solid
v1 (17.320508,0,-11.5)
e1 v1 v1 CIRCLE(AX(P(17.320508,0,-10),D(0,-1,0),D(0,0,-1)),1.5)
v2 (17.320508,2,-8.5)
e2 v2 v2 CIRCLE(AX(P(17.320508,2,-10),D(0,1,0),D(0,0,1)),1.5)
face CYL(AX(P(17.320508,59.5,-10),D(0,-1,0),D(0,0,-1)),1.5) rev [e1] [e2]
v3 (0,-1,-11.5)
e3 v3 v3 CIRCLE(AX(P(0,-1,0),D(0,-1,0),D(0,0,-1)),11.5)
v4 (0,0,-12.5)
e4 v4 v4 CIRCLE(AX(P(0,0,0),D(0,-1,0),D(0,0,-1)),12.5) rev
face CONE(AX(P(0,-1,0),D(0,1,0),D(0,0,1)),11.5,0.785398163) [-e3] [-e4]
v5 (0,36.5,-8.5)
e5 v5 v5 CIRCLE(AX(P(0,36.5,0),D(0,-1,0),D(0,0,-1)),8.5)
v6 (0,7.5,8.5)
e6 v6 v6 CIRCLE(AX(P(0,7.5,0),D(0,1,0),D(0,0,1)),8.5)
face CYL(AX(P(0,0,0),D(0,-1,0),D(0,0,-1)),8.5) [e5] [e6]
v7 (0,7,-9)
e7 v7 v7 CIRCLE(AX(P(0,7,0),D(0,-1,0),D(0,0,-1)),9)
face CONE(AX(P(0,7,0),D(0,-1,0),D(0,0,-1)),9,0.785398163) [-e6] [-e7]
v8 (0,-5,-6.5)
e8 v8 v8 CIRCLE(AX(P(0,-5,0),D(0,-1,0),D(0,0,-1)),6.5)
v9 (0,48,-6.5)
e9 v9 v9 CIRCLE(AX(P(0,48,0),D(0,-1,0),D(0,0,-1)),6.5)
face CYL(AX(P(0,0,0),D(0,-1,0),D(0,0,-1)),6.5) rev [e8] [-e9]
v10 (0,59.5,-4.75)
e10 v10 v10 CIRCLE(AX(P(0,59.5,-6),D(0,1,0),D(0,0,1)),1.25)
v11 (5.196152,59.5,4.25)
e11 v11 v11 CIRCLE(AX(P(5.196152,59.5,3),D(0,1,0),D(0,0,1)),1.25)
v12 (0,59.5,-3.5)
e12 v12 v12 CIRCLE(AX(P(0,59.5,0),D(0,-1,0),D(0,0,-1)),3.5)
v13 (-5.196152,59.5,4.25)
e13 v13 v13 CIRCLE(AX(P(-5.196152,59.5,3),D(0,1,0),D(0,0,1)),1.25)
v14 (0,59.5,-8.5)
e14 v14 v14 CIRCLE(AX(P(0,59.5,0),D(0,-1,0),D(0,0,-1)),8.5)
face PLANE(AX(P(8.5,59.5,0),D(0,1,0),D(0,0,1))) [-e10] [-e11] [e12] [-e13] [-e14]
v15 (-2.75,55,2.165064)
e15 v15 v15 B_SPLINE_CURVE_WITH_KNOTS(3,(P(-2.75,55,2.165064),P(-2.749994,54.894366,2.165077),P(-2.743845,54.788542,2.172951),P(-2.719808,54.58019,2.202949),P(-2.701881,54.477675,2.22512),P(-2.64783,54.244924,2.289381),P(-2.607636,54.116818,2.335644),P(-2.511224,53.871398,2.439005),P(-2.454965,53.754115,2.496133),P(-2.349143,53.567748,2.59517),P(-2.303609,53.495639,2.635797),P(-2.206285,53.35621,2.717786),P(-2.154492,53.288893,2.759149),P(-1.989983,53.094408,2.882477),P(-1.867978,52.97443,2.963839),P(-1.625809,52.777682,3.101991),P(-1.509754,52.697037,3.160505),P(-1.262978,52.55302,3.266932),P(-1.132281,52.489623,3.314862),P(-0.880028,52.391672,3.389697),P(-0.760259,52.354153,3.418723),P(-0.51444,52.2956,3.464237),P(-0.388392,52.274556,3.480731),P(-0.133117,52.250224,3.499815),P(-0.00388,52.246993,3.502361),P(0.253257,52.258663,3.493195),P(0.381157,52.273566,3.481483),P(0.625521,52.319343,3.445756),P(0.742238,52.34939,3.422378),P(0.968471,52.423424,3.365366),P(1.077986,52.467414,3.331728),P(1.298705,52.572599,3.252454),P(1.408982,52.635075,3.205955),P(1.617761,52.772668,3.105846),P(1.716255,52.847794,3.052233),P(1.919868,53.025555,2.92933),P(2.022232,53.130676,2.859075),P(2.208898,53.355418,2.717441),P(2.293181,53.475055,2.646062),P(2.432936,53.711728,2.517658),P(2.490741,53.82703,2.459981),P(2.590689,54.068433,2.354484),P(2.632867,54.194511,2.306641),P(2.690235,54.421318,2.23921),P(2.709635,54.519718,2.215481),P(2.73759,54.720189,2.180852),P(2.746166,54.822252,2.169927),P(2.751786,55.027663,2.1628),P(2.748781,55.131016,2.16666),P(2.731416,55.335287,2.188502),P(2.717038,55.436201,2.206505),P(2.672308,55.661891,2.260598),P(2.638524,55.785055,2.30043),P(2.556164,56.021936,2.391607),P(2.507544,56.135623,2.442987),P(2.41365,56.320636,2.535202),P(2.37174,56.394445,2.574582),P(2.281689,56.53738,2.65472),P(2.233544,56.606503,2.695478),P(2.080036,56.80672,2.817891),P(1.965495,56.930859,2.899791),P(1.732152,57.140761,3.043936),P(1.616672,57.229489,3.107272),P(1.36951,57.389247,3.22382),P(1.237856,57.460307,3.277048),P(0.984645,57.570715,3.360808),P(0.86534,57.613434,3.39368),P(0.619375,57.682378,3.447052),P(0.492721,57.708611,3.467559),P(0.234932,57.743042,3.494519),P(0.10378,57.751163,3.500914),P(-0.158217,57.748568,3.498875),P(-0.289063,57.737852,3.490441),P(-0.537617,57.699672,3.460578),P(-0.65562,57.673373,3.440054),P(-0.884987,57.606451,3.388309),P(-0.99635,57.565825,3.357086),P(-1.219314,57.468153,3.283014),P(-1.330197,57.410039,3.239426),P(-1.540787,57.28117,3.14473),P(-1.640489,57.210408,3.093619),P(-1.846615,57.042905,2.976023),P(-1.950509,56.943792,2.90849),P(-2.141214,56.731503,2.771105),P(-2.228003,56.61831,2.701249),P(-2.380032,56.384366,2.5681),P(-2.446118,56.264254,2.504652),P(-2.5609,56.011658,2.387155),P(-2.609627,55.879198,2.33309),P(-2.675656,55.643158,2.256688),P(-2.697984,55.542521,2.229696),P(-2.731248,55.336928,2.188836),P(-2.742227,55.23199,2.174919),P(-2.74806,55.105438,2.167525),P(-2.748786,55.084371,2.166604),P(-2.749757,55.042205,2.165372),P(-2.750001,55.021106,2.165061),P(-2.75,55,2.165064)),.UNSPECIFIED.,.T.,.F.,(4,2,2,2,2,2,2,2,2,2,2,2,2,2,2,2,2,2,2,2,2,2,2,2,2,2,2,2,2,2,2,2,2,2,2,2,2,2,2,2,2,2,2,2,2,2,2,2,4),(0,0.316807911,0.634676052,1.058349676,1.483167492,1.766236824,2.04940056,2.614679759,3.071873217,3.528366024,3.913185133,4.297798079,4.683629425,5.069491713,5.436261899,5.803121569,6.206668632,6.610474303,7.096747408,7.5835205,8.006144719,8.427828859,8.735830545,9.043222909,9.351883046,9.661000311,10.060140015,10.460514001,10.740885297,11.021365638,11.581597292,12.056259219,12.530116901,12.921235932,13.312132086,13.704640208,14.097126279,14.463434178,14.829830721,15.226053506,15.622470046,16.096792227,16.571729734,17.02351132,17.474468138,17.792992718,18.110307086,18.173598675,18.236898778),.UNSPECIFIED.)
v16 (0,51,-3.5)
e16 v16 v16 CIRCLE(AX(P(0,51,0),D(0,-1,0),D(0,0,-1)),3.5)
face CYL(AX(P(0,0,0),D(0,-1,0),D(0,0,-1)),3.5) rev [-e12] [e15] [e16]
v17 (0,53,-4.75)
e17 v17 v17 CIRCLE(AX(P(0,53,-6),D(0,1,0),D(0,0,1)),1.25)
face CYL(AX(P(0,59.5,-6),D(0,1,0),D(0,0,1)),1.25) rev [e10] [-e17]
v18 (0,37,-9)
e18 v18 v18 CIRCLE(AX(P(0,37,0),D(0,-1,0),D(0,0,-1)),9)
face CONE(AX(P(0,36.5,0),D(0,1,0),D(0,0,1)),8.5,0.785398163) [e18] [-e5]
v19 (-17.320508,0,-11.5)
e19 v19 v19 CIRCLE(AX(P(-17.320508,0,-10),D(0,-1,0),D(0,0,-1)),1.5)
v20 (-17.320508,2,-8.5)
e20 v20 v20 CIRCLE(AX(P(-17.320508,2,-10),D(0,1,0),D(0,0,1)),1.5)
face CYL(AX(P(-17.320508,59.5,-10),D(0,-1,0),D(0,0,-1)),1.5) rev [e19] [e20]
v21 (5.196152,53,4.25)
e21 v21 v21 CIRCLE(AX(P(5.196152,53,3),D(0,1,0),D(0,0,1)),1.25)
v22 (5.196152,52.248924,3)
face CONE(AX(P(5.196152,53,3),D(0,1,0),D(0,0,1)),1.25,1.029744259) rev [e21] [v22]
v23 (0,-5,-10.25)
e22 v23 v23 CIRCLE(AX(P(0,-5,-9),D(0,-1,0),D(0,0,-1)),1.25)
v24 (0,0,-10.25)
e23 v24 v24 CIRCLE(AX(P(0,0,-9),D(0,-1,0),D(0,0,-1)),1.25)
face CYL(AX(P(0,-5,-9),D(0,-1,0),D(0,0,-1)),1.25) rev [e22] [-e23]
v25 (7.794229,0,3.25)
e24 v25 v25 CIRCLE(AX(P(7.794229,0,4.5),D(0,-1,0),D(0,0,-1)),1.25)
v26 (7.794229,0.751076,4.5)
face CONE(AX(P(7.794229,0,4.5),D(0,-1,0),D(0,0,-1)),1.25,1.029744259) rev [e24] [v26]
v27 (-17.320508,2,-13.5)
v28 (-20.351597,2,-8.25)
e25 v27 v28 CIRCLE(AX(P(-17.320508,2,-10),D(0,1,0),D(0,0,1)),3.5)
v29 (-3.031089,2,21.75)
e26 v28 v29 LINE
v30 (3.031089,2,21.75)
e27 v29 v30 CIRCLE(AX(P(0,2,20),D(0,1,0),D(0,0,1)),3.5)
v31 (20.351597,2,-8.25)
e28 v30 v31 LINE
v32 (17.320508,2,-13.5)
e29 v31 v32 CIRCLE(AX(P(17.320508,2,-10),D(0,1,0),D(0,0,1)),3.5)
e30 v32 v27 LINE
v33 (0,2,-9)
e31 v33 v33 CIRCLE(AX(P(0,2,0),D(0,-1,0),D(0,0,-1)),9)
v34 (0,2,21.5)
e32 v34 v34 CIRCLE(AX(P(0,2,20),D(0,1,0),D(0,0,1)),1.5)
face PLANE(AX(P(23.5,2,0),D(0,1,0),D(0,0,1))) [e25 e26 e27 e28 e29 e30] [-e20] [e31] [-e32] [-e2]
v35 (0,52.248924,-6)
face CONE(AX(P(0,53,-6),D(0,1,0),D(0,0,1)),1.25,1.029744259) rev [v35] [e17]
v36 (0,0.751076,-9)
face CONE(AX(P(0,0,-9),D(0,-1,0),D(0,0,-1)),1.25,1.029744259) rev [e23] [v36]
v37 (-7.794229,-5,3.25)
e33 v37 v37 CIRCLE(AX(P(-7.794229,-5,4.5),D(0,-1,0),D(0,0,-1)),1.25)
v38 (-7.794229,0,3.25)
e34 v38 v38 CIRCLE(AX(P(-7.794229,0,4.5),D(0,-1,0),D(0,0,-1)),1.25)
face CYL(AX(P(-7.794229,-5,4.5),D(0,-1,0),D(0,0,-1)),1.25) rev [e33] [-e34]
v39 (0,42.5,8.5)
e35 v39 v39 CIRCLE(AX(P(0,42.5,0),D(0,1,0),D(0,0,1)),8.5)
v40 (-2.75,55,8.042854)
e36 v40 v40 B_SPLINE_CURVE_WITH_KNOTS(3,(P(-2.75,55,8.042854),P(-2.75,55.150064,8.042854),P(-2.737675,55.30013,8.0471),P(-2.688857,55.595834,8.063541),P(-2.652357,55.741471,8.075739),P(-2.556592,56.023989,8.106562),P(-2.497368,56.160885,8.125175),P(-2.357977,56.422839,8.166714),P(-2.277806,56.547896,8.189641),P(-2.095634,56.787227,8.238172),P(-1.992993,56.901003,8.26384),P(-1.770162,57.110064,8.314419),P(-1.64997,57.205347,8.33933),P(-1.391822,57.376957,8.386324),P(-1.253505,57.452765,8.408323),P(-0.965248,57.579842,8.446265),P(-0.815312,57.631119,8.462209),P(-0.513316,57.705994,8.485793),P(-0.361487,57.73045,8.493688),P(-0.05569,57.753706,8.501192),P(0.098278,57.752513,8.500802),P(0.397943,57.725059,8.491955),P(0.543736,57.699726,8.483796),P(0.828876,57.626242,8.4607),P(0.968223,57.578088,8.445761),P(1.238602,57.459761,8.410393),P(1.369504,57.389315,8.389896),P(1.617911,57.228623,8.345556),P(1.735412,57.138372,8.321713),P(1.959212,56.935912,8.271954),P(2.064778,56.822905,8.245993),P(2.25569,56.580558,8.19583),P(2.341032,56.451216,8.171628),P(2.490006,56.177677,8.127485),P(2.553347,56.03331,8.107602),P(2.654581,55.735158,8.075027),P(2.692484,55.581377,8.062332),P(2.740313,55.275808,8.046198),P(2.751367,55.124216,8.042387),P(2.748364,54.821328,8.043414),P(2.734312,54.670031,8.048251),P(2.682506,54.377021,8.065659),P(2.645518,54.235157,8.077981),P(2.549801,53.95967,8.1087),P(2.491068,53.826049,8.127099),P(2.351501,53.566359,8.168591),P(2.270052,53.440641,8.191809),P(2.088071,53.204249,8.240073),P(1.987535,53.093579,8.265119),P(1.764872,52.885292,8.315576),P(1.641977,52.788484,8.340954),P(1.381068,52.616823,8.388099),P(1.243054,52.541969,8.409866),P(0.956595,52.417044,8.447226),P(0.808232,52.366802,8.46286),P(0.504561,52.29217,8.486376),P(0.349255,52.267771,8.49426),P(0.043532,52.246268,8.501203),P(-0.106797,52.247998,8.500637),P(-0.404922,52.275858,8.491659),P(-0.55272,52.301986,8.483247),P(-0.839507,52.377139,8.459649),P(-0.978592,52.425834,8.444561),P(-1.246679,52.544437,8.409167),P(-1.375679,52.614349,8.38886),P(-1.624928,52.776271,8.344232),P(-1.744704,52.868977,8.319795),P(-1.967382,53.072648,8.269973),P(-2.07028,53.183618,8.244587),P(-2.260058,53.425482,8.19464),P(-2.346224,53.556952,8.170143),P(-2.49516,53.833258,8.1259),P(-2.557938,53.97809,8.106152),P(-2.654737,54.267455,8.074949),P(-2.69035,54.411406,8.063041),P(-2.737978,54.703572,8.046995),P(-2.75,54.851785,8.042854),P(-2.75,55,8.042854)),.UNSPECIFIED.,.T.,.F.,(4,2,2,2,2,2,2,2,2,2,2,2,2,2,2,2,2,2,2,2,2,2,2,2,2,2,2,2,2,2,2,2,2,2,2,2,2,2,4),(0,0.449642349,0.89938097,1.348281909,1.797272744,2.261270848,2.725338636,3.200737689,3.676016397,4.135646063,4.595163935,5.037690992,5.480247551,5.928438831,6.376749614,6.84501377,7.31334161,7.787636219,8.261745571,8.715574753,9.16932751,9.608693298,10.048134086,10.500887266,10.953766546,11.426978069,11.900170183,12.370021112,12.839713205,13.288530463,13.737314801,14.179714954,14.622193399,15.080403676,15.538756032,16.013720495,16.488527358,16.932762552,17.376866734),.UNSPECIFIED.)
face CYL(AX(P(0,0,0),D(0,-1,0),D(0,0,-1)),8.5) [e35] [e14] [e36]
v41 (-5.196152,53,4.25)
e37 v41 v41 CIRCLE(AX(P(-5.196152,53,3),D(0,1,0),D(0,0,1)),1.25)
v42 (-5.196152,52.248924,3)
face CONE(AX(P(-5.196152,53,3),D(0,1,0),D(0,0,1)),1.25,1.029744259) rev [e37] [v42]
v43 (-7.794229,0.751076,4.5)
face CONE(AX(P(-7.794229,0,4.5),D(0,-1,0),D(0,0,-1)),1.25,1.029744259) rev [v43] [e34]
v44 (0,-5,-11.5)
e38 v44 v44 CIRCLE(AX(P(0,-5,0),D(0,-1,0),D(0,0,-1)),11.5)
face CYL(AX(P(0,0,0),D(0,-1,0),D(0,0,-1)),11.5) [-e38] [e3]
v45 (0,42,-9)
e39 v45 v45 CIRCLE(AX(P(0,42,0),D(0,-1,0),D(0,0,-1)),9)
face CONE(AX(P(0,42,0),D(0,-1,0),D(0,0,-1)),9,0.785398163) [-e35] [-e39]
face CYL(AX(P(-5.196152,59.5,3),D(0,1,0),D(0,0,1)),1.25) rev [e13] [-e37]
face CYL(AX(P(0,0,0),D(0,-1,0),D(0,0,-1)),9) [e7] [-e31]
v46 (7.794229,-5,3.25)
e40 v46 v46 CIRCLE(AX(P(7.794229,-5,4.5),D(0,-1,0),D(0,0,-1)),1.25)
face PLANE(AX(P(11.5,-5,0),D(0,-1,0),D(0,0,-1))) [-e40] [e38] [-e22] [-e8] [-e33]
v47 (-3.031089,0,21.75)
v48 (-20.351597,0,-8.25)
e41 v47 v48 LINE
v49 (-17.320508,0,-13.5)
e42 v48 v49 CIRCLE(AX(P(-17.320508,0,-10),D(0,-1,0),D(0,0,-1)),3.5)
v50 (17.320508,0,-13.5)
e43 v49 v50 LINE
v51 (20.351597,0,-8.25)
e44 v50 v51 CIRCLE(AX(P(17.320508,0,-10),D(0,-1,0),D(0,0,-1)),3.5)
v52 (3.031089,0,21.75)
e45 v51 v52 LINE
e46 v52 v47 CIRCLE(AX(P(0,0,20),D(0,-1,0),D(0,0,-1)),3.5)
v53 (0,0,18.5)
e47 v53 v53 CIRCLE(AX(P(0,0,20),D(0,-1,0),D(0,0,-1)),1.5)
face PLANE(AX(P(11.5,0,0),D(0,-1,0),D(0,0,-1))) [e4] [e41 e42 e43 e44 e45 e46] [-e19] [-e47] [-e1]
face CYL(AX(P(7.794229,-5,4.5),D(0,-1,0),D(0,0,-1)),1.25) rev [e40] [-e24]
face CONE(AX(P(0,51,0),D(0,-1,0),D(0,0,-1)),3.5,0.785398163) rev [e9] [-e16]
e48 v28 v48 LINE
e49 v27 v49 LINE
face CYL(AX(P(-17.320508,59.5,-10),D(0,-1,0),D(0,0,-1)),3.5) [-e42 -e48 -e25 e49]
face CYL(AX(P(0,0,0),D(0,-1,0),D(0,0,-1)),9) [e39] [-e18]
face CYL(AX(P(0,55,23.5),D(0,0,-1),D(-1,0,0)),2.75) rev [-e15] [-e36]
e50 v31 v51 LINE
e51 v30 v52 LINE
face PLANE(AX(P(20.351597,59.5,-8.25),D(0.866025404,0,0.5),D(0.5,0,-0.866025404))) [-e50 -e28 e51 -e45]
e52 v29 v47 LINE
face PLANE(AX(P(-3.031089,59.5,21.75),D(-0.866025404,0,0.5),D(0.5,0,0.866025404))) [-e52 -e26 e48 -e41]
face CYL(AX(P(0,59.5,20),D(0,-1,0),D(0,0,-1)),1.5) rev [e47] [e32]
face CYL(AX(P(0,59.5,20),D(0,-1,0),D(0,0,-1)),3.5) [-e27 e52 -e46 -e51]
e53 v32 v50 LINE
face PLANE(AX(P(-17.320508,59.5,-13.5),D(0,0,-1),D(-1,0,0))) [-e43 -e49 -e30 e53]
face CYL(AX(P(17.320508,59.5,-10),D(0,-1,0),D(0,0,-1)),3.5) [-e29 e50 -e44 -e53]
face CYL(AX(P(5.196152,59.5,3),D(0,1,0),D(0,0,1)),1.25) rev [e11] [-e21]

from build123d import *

# Parameters (mm, degrees)
CHAMFER_1_SIZE         = 0.5
CHAMFER_2_SIZE         = 1
SKETCH_9_OUTSIDE_W     = 67.524
SKETCH_9_OUTSIDE_H     = 67.524
SKETCH_9_OUTSIDE_R     = 1.5
CUT_EXTRUDE_2_DEPTH    = 69.152402746
HOLE_WIZARD_M3_1_D     = 2.5
HOLE_WIZARD_M3_1_DEPTH = 5
HOLE_WIZARD_M3_1_TIP   = 0.751075774
HOLE_WIZARD_M3_2_D     = 2.5
HOLE_WIZARD_M3_2_DEPTH = 6.5
HOLE_WIZARD_M3_2_TIP   = 0.751075774
SKETCH_11_R            = 2.75
CUT_EXTRUDE_4_DEPTH    = 68.275504878


with BuildPart() as part:
    # 草图2 → 旋转1 (revolve)
    with BuildSketch(Plane.XY, mode=Mode.PRIVATE) as revolve_1_sk:
        Polygon((9, 2), (9, 7), (8.5, 7), (8.5, 37), (9, 37), (9, 42), (8.5, 42), (8.5, 59.5), (3.5, 59.5), (3.5, 51), (6.5, 48), (6.5, -5), (11.5, -5), (11.5, 0), (23.5, 0), (23.5, 2), align=None)
    revolve(revolve_1_sk.sketch.rotate(Axis((0, 0, 0), (0, 1, 0)), 90), axis=Axis((0, 0, 0), (0, 1, 0)))

    # 倒角1
    chamfer_1_edges = [part.edges().sort_by_distance(p)[0] for p in [
        (0, 7, 8.5),
        (0, 37, 8.5),
        (0, 42, 8.5),
    ]]
    chamfer(chamfer_1_edges, length=CHAMFER_1_SIZE - 0.0001)  # a hair under: the kernel refuses the full size

    # 倒角2
    chamfer_2_edges = [part.edges().sort_by_distance(p)[0] for p in [
        (0, 0, 11.5),
    ]]
    chamfer(chamfer_2_edges, length=CHAMFER_2_SIZE)

    # 草图9 outside → 切除-拉伸2 (cut, through all)
    # profile 1 of 4: a face of its own
    with BuildSketch(Plane.XZ):
        Rectangle(SKETCH_9_OUTSIDE_W, SKETCH_9_OUTSIDE_H)
        with BuildLine():
            Line((-3.031088913, 21.75), (-20.351596989, -8.25))
            ThreePointArc((-20.351596989, -8.25), (-20.351596989, -11.75), (-17.320508076, -13.5))
            Line((-17.320508076, -13.5), (17.320508076, -13.5))
            ThreePointArc((17.320508076, -13.5), (20.351596989, -11.75), (20.351596989, -8.25))
            Line((20.351596989, -8.25), (3.031088913, 21.75))
            ThreePointArc((3.031088913, 21.75), (0, 23.5), (-3.031088913, 21.75))
        make_face(mode=Mode.SUBTRACT)
    # profile 2 of 4: a face of its own
    with BuildSketch(Plane.XZ):
        with Locations(Location((0, 20, 0), (0, 0, 270))):
            Circle(SKETCH_9_OUTSIDE_R)
    # profile 3 of 4: a face of its own
    with BuildSketch(Plane.XZ):
        with Locations(Location((17.320508076, -10, 0), (0, 0, 270))):
            Circle(SKETCH_9_OUTSIDE_R)
    # profile 4 of 4: a face of its own
    with BuildSketch(Plane.XZ):
        with Locations(Location((-17.320508076, -10, 0), (0, 0, 270))):
            Circle(SKETCH_9_OUTSIDE_R)
    extrude(amount=-CUT_EXTRUDE_2_DEPTH, mode=Mode.SUBTRACT)

    # M3 螺纹孔1
    with Locations(Plane.XZ.offset(5)):
        with Locations((0, -9), (7.794228634, 4.5), (-7.794228634, 4.5)):
            Hole(HOLE_WIZARD_M3_1_D / 2, depth=HOLE_WIZARD_M3_1_DEPTH)
            with Locations((0, 0, -(HOLE_WIZARD_M3_1_DEPTH + HOLE_WIZARD_M3_1_TIP / 2))):  # 118° drill point
                Cone(0, HOLE_WIZARD_M3_1_D / 2, HOLE_WIZARD_M3_1_TIP, mode=Mode.SUBTRACT)

    # M3 螺纹孔2
    with Locations(Plane(origin=(0, 59.5, 0), x_dir=(1, 0, 0), z_dir=(0, 1, 0))):
        with Locations((0, 6), (5.196152423, -3), (-5.196152423, -3)):
            Hole(HOLE_WIZARD_M3_2_D / 2, depth=HOLE_WIZARD_M3_2_DEPTH)
            with Locations((0, 0, -(HOLE_WIZARD_M3_2_DEPTH + HOLE_WIZARD_M3_2_TIP / 2))):  # 118° drill point
                Cone(0, HOLE_WIZARD_M3_2_D / 2, HOLE_WIZARD_M3_2_TIP, mode=Mode.SUBTRACT)

    # 草图11 → 切除-拉伸4 (cut, through all)
    with BuildSketch(Plane.XY):
        with Locations(Location((0, 55, 0), (0, 0, 180))):
            Circle(SKETCH_11_R)
    extrude(amount=CUT_EXTRUDE_4_DEPTH, mode=Mode.SUBTRACT)


solid = part.part
